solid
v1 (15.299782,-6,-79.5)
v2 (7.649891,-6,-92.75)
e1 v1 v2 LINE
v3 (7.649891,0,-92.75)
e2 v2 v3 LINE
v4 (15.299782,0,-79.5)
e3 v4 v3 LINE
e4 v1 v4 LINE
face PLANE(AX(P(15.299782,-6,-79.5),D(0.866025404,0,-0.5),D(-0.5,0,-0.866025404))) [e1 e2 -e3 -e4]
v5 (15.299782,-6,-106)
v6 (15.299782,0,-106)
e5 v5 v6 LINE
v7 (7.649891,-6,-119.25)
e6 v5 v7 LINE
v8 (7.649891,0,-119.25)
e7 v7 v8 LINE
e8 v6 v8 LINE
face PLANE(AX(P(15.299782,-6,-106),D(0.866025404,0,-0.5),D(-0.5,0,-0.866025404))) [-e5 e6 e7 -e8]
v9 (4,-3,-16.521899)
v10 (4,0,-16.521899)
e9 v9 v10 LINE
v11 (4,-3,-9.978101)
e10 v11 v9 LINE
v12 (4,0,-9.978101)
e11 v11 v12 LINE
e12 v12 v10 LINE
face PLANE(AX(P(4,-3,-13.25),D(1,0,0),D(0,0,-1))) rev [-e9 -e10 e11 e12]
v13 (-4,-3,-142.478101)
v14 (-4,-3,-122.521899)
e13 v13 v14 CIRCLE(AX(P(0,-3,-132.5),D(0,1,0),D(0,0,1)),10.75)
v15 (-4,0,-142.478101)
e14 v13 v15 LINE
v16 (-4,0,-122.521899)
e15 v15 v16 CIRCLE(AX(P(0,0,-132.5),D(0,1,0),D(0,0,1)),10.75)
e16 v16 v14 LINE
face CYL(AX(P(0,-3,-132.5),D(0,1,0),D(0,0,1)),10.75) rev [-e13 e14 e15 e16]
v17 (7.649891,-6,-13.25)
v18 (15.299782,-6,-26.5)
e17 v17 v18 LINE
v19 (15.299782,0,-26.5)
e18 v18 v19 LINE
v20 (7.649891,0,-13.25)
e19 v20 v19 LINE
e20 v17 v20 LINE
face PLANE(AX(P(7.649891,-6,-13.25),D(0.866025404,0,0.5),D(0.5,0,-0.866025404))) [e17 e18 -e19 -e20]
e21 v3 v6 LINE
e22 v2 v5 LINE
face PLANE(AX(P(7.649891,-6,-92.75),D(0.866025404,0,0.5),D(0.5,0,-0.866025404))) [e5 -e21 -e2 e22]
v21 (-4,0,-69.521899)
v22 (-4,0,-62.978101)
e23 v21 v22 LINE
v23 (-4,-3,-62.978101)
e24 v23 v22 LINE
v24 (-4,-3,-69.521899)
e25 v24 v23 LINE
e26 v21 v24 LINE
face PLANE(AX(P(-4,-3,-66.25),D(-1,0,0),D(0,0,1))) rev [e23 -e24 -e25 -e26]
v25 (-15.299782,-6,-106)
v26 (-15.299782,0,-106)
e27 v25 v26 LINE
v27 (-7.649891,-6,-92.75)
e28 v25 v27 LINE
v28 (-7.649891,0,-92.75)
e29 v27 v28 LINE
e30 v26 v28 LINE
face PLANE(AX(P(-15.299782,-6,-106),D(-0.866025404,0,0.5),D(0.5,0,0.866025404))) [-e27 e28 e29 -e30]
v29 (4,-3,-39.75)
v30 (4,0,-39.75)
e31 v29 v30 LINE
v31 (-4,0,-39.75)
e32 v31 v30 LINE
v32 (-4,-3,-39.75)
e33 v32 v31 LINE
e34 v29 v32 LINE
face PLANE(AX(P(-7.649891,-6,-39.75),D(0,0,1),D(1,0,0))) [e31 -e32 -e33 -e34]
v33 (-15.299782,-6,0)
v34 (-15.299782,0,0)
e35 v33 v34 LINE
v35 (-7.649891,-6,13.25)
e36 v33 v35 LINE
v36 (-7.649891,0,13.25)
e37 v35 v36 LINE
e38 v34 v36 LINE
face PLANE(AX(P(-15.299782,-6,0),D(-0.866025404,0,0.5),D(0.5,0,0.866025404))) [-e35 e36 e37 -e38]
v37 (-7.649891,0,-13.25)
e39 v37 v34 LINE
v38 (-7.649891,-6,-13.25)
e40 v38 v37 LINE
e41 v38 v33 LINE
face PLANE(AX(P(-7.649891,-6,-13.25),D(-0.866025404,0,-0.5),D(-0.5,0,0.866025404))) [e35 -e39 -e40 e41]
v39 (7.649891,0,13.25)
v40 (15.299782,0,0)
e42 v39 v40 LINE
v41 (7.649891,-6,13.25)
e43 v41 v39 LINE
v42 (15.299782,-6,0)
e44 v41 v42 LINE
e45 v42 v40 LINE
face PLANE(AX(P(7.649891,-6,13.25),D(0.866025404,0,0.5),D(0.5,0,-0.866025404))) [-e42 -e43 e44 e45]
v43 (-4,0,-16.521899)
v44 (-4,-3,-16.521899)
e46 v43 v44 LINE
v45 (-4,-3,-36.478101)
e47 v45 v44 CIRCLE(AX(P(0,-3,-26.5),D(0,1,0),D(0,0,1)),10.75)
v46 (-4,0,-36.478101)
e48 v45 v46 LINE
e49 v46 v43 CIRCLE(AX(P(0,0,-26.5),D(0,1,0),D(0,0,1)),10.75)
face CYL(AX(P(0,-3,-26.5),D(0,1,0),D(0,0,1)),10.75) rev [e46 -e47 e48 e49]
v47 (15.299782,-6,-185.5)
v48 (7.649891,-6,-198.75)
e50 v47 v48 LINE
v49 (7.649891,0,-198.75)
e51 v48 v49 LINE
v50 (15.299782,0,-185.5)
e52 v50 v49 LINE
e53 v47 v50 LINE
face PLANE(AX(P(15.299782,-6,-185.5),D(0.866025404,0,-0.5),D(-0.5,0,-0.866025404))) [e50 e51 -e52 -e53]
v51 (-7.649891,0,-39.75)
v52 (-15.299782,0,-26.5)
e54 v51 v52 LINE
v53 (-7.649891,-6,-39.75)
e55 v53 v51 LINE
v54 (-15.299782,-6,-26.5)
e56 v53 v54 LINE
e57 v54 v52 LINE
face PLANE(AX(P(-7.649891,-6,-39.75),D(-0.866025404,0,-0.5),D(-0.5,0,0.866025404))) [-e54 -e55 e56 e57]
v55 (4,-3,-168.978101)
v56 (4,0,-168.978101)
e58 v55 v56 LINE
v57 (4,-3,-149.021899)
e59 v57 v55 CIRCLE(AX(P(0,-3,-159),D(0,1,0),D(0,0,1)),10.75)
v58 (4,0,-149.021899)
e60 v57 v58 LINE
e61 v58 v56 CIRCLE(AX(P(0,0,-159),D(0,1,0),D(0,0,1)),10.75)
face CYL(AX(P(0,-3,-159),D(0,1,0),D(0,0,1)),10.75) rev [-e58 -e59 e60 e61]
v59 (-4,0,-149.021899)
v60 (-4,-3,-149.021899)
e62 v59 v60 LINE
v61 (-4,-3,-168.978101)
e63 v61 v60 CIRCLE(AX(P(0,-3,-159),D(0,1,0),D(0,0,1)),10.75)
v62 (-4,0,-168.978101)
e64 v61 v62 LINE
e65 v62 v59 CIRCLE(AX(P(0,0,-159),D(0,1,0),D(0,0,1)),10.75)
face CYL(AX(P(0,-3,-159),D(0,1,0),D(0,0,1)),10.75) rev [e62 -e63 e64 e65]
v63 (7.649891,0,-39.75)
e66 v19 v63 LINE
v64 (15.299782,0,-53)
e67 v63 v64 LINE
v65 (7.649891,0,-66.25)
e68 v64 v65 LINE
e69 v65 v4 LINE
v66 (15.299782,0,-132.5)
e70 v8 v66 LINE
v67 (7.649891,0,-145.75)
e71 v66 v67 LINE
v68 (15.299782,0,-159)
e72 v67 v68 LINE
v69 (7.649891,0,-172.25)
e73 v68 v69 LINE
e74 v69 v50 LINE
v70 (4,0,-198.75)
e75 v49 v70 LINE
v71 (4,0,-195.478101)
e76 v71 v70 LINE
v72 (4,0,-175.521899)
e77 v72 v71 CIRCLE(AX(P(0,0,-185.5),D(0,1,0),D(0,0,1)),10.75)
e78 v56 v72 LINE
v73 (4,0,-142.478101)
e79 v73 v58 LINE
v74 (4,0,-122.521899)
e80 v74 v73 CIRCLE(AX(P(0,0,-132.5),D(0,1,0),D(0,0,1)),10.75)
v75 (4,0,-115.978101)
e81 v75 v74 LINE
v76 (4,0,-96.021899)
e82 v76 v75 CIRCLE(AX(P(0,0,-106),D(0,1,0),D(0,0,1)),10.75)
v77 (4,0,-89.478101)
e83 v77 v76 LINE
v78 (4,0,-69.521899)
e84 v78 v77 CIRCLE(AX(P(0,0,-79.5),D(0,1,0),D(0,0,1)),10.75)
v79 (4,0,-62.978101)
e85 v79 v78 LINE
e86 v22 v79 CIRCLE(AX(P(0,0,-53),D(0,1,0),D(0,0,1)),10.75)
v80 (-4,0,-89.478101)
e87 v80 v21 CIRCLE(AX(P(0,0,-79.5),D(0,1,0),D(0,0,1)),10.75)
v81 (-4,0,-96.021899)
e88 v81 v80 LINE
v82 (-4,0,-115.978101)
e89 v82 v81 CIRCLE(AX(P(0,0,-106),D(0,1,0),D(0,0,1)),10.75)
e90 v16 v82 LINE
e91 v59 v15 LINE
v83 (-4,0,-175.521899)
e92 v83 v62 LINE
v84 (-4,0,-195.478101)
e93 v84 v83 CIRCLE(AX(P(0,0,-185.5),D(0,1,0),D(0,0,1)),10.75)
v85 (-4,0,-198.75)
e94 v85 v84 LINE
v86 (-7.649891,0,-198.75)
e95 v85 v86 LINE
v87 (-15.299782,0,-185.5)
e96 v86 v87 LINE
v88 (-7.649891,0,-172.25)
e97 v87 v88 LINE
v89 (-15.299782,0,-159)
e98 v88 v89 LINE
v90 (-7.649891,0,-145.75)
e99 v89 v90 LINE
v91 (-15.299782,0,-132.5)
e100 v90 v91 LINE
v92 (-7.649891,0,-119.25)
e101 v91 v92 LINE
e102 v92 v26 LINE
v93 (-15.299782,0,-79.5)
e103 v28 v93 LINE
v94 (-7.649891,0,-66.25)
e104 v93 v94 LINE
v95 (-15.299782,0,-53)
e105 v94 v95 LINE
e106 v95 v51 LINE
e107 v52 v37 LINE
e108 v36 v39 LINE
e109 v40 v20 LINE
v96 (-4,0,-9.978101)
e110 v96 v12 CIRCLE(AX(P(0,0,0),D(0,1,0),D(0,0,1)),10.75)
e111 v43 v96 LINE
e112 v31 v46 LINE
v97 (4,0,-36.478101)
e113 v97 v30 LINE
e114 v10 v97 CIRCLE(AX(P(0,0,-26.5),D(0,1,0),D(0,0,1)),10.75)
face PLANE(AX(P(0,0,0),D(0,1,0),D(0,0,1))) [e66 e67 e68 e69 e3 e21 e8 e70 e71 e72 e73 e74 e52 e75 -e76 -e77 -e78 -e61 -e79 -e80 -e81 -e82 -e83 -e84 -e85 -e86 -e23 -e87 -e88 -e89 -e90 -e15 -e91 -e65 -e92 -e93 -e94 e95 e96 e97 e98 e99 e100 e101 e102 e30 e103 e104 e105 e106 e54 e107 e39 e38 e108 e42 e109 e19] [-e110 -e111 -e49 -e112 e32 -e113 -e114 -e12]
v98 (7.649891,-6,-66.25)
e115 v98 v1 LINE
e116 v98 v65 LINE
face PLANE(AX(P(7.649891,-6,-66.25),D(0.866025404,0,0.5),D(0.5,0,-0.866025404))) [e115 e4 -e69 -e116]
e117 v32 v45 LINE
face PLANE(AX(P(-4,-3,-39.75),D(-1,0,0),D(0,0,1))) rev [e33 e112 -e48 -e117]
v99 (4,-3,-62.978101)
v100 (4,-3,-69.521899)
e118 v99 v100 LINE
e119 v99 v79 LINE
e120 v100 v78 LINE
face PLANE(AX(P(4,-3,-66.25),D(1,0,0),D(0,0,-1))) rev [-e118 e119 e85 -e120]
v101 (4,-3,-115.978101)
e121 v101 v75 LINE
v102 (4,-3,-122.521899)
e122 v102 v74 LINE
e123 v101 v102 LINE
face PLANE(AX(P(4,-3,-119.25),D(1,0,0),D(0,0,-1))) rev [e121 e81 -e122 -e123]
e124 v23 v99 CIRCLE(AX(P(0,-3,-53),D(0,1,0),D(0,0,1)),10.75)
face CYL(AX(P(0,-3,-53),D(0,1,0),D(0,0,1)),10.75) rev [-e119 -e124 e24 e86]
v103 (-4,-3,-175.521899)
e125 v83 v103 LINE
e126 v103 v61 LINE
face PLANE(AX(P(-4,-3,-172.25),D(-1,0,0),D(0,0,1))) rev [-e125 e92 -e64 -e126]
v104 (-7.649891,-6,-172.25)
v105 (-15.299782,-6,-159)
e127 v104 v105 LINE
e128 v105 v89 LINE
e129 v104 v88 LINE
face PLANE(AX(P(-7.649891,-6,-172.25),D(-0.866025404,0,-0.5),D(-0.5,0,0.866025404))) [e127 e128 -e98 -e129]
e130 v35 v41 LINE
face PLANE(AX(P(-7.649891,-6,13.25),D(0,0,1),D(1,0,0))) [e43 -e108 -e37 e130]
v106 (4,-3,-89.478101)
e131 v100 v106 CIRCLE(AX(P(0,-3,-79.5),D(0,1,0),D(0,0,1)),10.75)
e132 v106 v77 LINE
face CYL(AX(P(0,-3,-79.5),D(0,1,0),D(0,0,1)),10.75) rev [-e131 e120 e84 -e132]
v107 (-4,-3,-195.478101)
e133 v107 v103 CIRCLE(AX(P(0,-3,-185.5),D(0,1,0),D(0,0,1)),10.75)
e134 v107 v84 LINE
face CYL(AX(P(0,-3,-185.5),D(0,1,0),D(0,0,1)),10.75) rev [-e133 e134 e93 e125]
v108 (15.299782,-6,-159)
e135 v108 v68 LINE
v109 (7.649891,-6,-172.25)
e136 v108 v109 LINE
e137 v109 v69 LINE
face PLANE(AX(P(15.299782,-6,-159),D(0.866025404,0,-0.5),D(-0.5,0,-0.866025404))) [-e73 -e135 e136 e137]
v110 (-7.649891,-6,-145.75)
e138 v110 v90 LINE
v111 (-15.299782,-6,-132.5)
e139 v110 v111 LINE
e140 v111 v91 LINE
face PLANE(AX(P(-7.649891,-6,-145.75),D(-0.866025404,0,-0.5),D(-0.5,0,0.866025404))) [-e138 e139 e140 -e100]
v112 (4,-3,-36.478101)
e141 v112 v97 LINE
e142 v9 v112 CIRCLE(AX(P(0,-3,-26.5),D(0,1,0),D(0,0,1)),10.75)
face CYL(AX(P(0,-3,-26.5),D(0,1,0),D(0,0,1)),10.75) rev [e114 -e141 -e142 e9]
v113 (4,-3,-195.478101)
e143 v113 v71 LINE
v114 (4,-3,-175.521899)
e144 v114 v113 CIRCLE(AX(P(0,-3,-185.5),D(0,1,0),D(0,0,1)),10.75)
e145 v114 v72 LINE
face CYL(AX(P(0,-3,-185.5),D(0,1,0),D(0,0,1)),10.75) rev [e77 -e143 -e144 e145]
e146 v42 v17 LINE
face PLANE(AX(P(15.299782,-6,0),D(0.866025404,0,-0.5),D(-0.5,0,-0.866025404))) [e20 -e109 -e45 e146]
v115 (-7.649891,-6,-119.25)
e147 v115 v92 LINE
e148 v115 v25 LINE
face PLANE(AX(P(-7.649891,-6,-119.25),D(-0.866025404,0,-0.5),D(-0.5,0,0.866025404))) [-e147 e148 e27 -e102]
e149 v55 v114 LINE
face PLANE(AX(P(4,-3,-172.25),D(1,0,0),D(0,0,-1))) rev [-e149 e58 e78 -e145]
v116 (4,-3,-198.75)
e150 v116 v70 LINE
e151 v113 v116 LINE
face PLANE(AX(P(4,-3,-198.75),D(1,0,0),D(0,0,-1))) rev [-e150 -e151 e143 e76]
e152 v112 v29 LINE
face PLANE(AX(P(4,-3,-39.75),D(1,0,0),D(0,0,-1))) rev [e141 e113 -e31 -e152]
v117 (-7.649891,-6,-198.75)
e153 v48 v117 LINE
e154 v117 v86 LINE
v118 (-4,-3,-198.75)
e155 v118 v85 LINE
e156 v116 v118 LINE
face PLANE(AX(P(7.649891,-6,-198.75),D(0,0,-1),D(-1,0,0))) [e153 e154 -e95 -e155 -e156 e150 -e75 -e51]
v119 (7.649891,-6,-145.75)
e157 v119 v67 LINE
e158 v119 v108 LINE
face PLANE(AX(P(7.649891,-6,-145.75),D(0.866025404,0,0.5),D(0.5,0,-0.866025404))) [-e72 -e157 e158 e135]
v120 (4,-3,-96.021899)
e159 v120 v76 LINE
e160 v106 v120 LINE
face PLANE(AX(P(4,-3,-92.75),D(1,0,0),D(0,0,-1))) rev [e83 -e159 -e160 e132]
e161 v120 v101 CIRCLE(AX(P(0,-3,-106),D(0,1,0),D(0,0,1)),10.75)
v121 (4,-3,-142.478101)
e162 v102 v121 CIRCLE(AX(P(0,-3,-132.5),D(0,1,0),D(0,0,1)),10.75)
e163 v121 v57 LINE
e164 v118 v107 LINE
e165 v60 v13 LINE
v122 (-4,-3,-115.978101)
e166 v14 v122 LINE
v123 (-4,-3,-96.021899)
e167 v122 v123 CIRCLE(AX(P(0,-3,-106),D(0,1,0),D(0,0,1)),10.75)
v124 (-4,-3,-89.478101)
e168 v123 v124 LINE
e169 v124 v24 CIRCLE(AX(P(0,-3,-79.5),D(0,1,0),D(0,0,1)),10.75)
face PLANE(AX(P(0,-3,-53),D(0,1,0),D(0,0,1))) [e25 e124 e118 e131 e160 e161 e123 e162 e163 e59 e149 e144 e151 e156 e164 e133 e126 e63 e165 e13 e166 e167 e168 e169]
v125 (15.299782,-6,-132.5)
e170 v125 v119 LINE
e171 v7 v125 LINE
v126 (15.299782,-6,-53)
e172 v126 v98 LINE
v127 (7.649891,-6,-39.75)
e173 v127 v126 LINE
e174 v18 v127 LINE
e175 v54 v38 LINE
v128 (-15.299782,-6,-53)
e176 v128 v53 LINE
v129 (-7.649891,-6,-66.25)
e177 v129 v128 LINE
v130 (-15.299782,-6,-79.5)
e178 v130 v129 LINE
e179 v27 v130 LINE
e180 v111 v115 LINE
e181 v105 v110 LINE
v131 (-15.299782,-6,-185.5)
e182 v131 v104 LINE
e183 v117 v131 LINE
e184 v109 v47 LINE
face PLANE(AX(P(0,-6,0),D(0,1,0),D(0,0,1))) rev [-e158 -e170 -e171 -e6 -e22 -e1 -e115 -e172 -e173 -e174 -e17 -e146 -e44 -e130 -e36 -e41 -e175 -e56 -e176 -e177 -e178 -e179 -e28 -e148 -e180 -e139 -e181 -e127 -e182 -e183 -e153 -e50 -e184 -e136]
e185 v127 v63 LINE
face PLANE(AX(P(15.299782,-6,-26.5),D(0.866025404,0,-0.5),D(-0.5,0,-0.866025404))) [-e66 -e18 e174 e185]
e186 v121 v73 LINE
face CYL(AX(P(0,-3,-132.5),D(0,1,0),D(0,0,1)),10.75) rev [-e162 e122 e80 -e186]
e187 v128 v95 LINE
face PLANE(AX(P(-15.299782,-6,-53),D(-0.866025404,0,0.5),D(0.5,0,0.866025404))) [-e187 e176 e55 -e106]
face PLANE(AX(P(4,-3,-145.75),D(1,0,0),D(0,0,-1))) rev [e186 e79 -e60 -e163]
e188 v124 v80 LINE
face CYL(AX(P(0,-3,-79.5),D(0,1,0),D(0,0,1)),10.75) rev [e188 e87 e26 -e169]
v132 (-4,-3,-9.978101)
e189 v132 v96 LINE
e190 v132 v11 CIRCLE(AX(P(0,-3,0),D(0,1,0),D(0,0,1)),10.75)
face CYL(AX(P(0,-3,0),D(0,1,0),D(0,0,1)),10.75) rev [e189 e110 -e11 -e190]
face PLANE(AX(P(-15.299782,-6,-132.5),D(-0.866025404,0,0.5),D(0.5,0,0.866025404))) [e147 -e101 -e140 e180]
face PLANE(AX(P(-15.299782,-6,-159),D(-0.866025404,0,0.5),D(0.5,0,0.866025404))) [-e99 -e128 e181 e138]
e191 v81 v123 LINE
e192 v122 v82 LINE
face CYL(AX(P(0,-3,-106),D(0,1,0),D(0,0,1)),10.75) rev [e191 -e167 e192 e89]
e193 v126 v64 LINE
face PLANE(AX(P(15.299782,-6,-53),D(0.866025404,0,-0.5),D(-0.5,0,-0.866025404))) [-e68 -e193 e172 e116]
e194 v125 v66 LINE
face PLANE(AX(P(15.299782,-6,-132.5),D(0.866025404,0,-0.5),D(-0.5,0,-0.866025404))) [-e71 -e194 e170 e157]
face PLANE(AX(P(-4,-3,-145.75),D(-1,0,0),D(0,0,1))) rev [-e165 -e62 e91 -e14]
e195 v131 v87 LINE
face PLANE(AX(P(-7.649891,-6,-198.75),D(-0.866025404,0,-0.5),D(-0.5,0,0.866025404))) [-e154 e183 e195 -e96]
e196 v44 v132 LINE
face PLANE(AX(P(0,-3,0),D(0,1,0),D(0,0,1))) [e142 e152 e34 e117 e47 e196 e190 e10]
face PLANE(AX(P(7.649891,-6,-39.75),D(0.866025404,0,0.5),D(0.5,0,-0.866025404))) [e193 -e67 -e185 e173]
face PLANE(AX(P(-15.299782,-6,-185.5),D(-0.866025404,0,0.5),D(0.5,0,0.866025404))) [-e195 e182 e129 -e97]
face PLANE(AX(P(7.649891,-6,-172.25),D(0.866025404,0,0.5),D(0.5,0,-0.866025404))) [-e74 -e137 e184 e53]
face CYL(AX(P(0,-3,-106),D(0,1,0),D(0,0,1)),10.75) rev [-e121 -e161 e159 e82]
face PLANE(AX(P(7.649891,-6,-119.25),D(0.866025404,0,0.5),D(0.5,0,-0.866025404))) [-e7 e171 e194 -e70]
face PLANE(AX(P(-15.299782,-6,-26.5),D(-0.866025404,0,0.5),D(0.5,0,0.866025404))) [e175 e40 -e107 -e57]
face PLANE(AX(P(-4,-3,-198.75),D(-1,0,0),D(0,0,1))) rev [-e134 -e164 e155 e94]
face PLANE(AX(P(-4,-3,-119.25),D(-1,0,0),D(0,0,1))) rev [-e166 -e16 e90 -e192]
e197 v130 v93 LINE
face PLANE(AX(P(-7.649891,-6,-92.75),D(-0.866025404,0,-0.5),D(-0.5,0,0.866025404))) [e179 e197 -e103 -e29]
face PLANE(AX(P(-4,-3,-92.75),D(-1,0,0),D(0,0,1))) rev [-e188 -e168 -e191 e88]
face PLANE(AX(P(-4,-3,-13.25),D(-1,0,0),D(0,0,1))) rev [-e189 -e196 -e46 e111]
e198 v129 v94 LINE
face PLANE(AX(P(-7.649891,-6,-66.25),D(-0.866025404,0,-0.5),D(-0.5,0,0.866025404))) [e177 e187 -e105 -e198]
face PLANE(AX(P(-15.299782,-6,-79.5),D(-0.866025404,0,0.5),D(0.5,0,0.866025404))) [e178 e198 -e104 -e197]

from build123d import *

# Parameters (mm, degrees)
BOSS_EXTRUDE1_DEPTH = 6
SKETCH2_R           = 10.75
CUT_EXTRUDE1_DEPTH  = 3
SKETCH4_W           = 8
SKETCH4_H           = 3.271898978
CUT_EXTRUDE2_DEPTH  = 3
LPATTERN1_COUNT     = 2
LPATTERN1_PITCH     = 26.5
SKETCH6_W           = 8
SKETCH6_H           = 3
CUT_EXTRUDE3_DEPTH  = 32.182259914
LPATTERN2_START     = -6
LPATTERN2_DEPTH     = 3
LPATTERN2_START_2   = -3
LPATTERN2_2_DEPTH   = 3


# Read off the part's stored shape, not the designer's step: LPattern2
with BuildPart() as part:
    # Sketch3 → Boss-Extrude1 (new body)
    with BuildSketch(Plane(origin=(0, 0, 0), x_dir=(1, 0, 0), z_dir=(0, 1, 0))):
        Polygon((15.299782134, 0), (7.649891067, 13.25), (-7.649891067, 13.25), (-15.299782134, 0), (-7.649891067, -13.25), (7.649891067, -13.25), align=None)
    boss_extrude1 = extrude(amount=-BOSS_EXTRUDE1_DEPTH)

    # Sketch2 → Cut-Extrude1 (cut)
    with BuildSketch(Plane(origin=(0, 0, 0), x_dir=(1, 0, 0), z_dir=(0, 1, 0))):
        with Locations(Location((0, 0, 0), (0, 0, 270))):
            Circle(SKETCH2_R)
    cut_extrude1 = extrude(amount=-CUT_EXTRUDE1_DEPTH, mode=Mode.SUBTRACT)

    # Sketch4 → Cut-Extrude2 (cut)
    with BuildSketch(Plane(origin=(0, 0, 0), x_dir=(1, 0, 0), z_dir=(0, 1, 0))):
        with Locations((0, 11.614050511)):
            Rectangle(SKETCH4_W, SKETCH4_H)
    cut_extrude2 = extrude(amount=-CUT_EXTRUDE2_DEPTH, mode=Mode.SUBTRACT)

    # LPattern1: Boss-Extrude1, Cut-Extrude1, Cut-Extrude2 ×2
    with Locations(*[(0, 0, -i * LPATTERN1_PITCH) for i in range(1, LPATTERN1_COUNT)]):
        add(boss_extrude1)
        add(cut_extrude1, mode=Mode.SUBTRACT)
        add(cut_extrude2, mode=Mode.SUBTRACT)

    # Sketch6 → Cut-Extrude3 (cut, through all)
    with BuildSketch(Plane.XY.offset(-13.25)):
        with Locations((0, -1.5)):
            Rectangle(SKETCH6_W, SKETCH6_H)
    extrude(amount=-CUT_EXTRUDE3_DEPTH, mode=Mode.SUBTRACT)

    # LPattern2 outline → LPattern2 (add)
    with BuildSketch(Plane(origin=(0, 0, 0), x_dir=(1, 0, 0), z_dir=(0, 1, 0)).offset(LPATTERN2_START)):
        Polygon((-7.649891067, 198.75), (-15.299782134, 185.5), (-7.649891067, 172.25), (-15.299782134, 159), (-7.649891067, 145.75), (-15.299782134, 132.5), (-7.649891067, 119.25), (-15.299782134, 106), (-7.649891067, 92.75), (-15.299782134, 79.5), (-7.649891067, 66.25), (-15.299782134, 53), (-7.649891067, 39.75), (7.649891067, 39.75), (15.299782134, 53), (7.649891067, 66.25), (15.299782134, 79.5), (7.649891067, 92.75), (15.299782134, 106), (7.649891067, 119.25), (15.299782134, 132.5), (7.649891067, 145.75), (15.299782134, 159), (7.649891067, 172.25), (15.299782134, 185.5), (7.649891067, 198.75), align=None)
    extrude(amount=LPATTERN2_DEPTH)

    # LPattern2 2 outline → LPattern2 2 (add)
    with BuildSketch(Plane(origin=(0, 0, 0), x_dir=(1, 0, 0), z_dir=(0, 1, 0)).offset(LPATTERN2_START_2)):
        with BuildLine():
            ThreePointArc((-4, 69.521898978), (-10.75, 79.5), (-4, 89.478101022))
            Line((-4, 89.478101022), (-4, 96.021898978))
            ThreePointArc((-4, 96.021898978), (-10.75, 106), (-4, 115.978101022))
            Line((-4, 115.978101022), (-4, 122.521898978))
            ThreePointArc((-4, 122.521898978), (-10.75, 132.5), (-4, 142.478101022))
            Line((-4, 142.478101022), (-4, 149.021898978))
            ThreePointArc((-4, 149.021898978), (-10.75, 159), (-4, 168.978101022))
            Line((-4, 168.978101022), (-4, 175.521898978))
            ThreePointArc((-4, 175.521898978), (-10.75, 185.5), (-4, 195.478101022))
            Line((-4, 195.478101022), (-4, 198.75))
            Line((-4, 198.75), (-7.649891067, 198.75))
            Line((-7.649891067, 198.75), (-15.299782134, 185.5))
            Line((-15.299782134, 185.5), (-7.649891067, 172.25))
            Line((-7.649891067, 172.25), (-15.299782134, 159))
            Line((-15.299782134, 159), (-7.649891067, 145.75))
            Line((-7.649891067, 145.75), (-15.299782134, 132.5))
            Line((-15.299782134, 132.5), (-7.649891067, 119.25))
            Line((-7.649891067, 119.25), (-15.299782134, 106))
            Line((-15.299782134, 106), (-7.649891067, 92.75))
            Line((-7.649891067, 92.75), (-15.299782134, 79.5))
            Line((-15.299782134, 79.5), (-7.649891067, 66.25))
            Line((-7.649891067, 66.25), (-15.299782134, 53))
            Line((-15.299782134, 53), (-7.649891067, 39.75))
            Line((-7.649891067, 39.75), (7.649891067, 39.75))
            Line((7.649891067, 39.75), (15.299782134, 53))
            Line((15.299782134, 53), (7.649891067, 66.25))
            Line((7.649891067, 66.25), (15.299782134, 79.5))
            Line((15.299782134, 79.5), (7.649891067, 92.75))
            Line((7.649891067, 92.75), (15.299782134, 106))
            Line((15.299782134, 106), (7.649891067, 119.25))
            Line((7.649891067, 119.25), (15.299782134, 132.5))
            Line((15.299782134, 132.5), (7.649891067, 145.75))
            Line((7.649891067, 145.75), (15.299782134, 159))
            Line((15.299782134, 159), (7.649891067, 172.25))
            Line((7.649891067, 172.25), (15.299782134, 185.5))
            Line((15.299782134, 185.5), (7.649891067, 198.75))
            Line((7.649891067, 198.75), (4, 198.75))
            Line((4, 198.75), (4, 195.478101022))
            ThreePointArc((4, 195.478101022), (10.75, 185.5), (4, 175.521898978))
            Line((4, 175.521898978), (4, 168.978101022))
            ThreePointArc((4, 168.978101022), (10.75, 159), (4, 149.021898978))
            Line((4, 149.021898978), (4, 142.478101022))
            ThreePointArc((4, 142.478101022), (10.75, 132.5), (4, 122.521898978))
            Line((4, 122.521898978), (4, 115.978101022))
            ThreePointArc((4, 115.978101022), (10.75, 106), (4, 96.021898978))
            Line((4, 96.021898978), (4, 89.478101022))
            ThreePointArc((4, 89.478101022), (10.75, 79.5), (4, 69.521898978))
            Line((4, 69.521898978), (4, 62.978101022))
            ThreePointArc((4, 62.978101022), (0, 42.25), (-4, 62.978101022))
            Line((-4, 62.978101022), (-4, 69.521898978))
        make_face()
    extrude(amount=LPATTERN2_2_DEPTH)


solid = part.part
